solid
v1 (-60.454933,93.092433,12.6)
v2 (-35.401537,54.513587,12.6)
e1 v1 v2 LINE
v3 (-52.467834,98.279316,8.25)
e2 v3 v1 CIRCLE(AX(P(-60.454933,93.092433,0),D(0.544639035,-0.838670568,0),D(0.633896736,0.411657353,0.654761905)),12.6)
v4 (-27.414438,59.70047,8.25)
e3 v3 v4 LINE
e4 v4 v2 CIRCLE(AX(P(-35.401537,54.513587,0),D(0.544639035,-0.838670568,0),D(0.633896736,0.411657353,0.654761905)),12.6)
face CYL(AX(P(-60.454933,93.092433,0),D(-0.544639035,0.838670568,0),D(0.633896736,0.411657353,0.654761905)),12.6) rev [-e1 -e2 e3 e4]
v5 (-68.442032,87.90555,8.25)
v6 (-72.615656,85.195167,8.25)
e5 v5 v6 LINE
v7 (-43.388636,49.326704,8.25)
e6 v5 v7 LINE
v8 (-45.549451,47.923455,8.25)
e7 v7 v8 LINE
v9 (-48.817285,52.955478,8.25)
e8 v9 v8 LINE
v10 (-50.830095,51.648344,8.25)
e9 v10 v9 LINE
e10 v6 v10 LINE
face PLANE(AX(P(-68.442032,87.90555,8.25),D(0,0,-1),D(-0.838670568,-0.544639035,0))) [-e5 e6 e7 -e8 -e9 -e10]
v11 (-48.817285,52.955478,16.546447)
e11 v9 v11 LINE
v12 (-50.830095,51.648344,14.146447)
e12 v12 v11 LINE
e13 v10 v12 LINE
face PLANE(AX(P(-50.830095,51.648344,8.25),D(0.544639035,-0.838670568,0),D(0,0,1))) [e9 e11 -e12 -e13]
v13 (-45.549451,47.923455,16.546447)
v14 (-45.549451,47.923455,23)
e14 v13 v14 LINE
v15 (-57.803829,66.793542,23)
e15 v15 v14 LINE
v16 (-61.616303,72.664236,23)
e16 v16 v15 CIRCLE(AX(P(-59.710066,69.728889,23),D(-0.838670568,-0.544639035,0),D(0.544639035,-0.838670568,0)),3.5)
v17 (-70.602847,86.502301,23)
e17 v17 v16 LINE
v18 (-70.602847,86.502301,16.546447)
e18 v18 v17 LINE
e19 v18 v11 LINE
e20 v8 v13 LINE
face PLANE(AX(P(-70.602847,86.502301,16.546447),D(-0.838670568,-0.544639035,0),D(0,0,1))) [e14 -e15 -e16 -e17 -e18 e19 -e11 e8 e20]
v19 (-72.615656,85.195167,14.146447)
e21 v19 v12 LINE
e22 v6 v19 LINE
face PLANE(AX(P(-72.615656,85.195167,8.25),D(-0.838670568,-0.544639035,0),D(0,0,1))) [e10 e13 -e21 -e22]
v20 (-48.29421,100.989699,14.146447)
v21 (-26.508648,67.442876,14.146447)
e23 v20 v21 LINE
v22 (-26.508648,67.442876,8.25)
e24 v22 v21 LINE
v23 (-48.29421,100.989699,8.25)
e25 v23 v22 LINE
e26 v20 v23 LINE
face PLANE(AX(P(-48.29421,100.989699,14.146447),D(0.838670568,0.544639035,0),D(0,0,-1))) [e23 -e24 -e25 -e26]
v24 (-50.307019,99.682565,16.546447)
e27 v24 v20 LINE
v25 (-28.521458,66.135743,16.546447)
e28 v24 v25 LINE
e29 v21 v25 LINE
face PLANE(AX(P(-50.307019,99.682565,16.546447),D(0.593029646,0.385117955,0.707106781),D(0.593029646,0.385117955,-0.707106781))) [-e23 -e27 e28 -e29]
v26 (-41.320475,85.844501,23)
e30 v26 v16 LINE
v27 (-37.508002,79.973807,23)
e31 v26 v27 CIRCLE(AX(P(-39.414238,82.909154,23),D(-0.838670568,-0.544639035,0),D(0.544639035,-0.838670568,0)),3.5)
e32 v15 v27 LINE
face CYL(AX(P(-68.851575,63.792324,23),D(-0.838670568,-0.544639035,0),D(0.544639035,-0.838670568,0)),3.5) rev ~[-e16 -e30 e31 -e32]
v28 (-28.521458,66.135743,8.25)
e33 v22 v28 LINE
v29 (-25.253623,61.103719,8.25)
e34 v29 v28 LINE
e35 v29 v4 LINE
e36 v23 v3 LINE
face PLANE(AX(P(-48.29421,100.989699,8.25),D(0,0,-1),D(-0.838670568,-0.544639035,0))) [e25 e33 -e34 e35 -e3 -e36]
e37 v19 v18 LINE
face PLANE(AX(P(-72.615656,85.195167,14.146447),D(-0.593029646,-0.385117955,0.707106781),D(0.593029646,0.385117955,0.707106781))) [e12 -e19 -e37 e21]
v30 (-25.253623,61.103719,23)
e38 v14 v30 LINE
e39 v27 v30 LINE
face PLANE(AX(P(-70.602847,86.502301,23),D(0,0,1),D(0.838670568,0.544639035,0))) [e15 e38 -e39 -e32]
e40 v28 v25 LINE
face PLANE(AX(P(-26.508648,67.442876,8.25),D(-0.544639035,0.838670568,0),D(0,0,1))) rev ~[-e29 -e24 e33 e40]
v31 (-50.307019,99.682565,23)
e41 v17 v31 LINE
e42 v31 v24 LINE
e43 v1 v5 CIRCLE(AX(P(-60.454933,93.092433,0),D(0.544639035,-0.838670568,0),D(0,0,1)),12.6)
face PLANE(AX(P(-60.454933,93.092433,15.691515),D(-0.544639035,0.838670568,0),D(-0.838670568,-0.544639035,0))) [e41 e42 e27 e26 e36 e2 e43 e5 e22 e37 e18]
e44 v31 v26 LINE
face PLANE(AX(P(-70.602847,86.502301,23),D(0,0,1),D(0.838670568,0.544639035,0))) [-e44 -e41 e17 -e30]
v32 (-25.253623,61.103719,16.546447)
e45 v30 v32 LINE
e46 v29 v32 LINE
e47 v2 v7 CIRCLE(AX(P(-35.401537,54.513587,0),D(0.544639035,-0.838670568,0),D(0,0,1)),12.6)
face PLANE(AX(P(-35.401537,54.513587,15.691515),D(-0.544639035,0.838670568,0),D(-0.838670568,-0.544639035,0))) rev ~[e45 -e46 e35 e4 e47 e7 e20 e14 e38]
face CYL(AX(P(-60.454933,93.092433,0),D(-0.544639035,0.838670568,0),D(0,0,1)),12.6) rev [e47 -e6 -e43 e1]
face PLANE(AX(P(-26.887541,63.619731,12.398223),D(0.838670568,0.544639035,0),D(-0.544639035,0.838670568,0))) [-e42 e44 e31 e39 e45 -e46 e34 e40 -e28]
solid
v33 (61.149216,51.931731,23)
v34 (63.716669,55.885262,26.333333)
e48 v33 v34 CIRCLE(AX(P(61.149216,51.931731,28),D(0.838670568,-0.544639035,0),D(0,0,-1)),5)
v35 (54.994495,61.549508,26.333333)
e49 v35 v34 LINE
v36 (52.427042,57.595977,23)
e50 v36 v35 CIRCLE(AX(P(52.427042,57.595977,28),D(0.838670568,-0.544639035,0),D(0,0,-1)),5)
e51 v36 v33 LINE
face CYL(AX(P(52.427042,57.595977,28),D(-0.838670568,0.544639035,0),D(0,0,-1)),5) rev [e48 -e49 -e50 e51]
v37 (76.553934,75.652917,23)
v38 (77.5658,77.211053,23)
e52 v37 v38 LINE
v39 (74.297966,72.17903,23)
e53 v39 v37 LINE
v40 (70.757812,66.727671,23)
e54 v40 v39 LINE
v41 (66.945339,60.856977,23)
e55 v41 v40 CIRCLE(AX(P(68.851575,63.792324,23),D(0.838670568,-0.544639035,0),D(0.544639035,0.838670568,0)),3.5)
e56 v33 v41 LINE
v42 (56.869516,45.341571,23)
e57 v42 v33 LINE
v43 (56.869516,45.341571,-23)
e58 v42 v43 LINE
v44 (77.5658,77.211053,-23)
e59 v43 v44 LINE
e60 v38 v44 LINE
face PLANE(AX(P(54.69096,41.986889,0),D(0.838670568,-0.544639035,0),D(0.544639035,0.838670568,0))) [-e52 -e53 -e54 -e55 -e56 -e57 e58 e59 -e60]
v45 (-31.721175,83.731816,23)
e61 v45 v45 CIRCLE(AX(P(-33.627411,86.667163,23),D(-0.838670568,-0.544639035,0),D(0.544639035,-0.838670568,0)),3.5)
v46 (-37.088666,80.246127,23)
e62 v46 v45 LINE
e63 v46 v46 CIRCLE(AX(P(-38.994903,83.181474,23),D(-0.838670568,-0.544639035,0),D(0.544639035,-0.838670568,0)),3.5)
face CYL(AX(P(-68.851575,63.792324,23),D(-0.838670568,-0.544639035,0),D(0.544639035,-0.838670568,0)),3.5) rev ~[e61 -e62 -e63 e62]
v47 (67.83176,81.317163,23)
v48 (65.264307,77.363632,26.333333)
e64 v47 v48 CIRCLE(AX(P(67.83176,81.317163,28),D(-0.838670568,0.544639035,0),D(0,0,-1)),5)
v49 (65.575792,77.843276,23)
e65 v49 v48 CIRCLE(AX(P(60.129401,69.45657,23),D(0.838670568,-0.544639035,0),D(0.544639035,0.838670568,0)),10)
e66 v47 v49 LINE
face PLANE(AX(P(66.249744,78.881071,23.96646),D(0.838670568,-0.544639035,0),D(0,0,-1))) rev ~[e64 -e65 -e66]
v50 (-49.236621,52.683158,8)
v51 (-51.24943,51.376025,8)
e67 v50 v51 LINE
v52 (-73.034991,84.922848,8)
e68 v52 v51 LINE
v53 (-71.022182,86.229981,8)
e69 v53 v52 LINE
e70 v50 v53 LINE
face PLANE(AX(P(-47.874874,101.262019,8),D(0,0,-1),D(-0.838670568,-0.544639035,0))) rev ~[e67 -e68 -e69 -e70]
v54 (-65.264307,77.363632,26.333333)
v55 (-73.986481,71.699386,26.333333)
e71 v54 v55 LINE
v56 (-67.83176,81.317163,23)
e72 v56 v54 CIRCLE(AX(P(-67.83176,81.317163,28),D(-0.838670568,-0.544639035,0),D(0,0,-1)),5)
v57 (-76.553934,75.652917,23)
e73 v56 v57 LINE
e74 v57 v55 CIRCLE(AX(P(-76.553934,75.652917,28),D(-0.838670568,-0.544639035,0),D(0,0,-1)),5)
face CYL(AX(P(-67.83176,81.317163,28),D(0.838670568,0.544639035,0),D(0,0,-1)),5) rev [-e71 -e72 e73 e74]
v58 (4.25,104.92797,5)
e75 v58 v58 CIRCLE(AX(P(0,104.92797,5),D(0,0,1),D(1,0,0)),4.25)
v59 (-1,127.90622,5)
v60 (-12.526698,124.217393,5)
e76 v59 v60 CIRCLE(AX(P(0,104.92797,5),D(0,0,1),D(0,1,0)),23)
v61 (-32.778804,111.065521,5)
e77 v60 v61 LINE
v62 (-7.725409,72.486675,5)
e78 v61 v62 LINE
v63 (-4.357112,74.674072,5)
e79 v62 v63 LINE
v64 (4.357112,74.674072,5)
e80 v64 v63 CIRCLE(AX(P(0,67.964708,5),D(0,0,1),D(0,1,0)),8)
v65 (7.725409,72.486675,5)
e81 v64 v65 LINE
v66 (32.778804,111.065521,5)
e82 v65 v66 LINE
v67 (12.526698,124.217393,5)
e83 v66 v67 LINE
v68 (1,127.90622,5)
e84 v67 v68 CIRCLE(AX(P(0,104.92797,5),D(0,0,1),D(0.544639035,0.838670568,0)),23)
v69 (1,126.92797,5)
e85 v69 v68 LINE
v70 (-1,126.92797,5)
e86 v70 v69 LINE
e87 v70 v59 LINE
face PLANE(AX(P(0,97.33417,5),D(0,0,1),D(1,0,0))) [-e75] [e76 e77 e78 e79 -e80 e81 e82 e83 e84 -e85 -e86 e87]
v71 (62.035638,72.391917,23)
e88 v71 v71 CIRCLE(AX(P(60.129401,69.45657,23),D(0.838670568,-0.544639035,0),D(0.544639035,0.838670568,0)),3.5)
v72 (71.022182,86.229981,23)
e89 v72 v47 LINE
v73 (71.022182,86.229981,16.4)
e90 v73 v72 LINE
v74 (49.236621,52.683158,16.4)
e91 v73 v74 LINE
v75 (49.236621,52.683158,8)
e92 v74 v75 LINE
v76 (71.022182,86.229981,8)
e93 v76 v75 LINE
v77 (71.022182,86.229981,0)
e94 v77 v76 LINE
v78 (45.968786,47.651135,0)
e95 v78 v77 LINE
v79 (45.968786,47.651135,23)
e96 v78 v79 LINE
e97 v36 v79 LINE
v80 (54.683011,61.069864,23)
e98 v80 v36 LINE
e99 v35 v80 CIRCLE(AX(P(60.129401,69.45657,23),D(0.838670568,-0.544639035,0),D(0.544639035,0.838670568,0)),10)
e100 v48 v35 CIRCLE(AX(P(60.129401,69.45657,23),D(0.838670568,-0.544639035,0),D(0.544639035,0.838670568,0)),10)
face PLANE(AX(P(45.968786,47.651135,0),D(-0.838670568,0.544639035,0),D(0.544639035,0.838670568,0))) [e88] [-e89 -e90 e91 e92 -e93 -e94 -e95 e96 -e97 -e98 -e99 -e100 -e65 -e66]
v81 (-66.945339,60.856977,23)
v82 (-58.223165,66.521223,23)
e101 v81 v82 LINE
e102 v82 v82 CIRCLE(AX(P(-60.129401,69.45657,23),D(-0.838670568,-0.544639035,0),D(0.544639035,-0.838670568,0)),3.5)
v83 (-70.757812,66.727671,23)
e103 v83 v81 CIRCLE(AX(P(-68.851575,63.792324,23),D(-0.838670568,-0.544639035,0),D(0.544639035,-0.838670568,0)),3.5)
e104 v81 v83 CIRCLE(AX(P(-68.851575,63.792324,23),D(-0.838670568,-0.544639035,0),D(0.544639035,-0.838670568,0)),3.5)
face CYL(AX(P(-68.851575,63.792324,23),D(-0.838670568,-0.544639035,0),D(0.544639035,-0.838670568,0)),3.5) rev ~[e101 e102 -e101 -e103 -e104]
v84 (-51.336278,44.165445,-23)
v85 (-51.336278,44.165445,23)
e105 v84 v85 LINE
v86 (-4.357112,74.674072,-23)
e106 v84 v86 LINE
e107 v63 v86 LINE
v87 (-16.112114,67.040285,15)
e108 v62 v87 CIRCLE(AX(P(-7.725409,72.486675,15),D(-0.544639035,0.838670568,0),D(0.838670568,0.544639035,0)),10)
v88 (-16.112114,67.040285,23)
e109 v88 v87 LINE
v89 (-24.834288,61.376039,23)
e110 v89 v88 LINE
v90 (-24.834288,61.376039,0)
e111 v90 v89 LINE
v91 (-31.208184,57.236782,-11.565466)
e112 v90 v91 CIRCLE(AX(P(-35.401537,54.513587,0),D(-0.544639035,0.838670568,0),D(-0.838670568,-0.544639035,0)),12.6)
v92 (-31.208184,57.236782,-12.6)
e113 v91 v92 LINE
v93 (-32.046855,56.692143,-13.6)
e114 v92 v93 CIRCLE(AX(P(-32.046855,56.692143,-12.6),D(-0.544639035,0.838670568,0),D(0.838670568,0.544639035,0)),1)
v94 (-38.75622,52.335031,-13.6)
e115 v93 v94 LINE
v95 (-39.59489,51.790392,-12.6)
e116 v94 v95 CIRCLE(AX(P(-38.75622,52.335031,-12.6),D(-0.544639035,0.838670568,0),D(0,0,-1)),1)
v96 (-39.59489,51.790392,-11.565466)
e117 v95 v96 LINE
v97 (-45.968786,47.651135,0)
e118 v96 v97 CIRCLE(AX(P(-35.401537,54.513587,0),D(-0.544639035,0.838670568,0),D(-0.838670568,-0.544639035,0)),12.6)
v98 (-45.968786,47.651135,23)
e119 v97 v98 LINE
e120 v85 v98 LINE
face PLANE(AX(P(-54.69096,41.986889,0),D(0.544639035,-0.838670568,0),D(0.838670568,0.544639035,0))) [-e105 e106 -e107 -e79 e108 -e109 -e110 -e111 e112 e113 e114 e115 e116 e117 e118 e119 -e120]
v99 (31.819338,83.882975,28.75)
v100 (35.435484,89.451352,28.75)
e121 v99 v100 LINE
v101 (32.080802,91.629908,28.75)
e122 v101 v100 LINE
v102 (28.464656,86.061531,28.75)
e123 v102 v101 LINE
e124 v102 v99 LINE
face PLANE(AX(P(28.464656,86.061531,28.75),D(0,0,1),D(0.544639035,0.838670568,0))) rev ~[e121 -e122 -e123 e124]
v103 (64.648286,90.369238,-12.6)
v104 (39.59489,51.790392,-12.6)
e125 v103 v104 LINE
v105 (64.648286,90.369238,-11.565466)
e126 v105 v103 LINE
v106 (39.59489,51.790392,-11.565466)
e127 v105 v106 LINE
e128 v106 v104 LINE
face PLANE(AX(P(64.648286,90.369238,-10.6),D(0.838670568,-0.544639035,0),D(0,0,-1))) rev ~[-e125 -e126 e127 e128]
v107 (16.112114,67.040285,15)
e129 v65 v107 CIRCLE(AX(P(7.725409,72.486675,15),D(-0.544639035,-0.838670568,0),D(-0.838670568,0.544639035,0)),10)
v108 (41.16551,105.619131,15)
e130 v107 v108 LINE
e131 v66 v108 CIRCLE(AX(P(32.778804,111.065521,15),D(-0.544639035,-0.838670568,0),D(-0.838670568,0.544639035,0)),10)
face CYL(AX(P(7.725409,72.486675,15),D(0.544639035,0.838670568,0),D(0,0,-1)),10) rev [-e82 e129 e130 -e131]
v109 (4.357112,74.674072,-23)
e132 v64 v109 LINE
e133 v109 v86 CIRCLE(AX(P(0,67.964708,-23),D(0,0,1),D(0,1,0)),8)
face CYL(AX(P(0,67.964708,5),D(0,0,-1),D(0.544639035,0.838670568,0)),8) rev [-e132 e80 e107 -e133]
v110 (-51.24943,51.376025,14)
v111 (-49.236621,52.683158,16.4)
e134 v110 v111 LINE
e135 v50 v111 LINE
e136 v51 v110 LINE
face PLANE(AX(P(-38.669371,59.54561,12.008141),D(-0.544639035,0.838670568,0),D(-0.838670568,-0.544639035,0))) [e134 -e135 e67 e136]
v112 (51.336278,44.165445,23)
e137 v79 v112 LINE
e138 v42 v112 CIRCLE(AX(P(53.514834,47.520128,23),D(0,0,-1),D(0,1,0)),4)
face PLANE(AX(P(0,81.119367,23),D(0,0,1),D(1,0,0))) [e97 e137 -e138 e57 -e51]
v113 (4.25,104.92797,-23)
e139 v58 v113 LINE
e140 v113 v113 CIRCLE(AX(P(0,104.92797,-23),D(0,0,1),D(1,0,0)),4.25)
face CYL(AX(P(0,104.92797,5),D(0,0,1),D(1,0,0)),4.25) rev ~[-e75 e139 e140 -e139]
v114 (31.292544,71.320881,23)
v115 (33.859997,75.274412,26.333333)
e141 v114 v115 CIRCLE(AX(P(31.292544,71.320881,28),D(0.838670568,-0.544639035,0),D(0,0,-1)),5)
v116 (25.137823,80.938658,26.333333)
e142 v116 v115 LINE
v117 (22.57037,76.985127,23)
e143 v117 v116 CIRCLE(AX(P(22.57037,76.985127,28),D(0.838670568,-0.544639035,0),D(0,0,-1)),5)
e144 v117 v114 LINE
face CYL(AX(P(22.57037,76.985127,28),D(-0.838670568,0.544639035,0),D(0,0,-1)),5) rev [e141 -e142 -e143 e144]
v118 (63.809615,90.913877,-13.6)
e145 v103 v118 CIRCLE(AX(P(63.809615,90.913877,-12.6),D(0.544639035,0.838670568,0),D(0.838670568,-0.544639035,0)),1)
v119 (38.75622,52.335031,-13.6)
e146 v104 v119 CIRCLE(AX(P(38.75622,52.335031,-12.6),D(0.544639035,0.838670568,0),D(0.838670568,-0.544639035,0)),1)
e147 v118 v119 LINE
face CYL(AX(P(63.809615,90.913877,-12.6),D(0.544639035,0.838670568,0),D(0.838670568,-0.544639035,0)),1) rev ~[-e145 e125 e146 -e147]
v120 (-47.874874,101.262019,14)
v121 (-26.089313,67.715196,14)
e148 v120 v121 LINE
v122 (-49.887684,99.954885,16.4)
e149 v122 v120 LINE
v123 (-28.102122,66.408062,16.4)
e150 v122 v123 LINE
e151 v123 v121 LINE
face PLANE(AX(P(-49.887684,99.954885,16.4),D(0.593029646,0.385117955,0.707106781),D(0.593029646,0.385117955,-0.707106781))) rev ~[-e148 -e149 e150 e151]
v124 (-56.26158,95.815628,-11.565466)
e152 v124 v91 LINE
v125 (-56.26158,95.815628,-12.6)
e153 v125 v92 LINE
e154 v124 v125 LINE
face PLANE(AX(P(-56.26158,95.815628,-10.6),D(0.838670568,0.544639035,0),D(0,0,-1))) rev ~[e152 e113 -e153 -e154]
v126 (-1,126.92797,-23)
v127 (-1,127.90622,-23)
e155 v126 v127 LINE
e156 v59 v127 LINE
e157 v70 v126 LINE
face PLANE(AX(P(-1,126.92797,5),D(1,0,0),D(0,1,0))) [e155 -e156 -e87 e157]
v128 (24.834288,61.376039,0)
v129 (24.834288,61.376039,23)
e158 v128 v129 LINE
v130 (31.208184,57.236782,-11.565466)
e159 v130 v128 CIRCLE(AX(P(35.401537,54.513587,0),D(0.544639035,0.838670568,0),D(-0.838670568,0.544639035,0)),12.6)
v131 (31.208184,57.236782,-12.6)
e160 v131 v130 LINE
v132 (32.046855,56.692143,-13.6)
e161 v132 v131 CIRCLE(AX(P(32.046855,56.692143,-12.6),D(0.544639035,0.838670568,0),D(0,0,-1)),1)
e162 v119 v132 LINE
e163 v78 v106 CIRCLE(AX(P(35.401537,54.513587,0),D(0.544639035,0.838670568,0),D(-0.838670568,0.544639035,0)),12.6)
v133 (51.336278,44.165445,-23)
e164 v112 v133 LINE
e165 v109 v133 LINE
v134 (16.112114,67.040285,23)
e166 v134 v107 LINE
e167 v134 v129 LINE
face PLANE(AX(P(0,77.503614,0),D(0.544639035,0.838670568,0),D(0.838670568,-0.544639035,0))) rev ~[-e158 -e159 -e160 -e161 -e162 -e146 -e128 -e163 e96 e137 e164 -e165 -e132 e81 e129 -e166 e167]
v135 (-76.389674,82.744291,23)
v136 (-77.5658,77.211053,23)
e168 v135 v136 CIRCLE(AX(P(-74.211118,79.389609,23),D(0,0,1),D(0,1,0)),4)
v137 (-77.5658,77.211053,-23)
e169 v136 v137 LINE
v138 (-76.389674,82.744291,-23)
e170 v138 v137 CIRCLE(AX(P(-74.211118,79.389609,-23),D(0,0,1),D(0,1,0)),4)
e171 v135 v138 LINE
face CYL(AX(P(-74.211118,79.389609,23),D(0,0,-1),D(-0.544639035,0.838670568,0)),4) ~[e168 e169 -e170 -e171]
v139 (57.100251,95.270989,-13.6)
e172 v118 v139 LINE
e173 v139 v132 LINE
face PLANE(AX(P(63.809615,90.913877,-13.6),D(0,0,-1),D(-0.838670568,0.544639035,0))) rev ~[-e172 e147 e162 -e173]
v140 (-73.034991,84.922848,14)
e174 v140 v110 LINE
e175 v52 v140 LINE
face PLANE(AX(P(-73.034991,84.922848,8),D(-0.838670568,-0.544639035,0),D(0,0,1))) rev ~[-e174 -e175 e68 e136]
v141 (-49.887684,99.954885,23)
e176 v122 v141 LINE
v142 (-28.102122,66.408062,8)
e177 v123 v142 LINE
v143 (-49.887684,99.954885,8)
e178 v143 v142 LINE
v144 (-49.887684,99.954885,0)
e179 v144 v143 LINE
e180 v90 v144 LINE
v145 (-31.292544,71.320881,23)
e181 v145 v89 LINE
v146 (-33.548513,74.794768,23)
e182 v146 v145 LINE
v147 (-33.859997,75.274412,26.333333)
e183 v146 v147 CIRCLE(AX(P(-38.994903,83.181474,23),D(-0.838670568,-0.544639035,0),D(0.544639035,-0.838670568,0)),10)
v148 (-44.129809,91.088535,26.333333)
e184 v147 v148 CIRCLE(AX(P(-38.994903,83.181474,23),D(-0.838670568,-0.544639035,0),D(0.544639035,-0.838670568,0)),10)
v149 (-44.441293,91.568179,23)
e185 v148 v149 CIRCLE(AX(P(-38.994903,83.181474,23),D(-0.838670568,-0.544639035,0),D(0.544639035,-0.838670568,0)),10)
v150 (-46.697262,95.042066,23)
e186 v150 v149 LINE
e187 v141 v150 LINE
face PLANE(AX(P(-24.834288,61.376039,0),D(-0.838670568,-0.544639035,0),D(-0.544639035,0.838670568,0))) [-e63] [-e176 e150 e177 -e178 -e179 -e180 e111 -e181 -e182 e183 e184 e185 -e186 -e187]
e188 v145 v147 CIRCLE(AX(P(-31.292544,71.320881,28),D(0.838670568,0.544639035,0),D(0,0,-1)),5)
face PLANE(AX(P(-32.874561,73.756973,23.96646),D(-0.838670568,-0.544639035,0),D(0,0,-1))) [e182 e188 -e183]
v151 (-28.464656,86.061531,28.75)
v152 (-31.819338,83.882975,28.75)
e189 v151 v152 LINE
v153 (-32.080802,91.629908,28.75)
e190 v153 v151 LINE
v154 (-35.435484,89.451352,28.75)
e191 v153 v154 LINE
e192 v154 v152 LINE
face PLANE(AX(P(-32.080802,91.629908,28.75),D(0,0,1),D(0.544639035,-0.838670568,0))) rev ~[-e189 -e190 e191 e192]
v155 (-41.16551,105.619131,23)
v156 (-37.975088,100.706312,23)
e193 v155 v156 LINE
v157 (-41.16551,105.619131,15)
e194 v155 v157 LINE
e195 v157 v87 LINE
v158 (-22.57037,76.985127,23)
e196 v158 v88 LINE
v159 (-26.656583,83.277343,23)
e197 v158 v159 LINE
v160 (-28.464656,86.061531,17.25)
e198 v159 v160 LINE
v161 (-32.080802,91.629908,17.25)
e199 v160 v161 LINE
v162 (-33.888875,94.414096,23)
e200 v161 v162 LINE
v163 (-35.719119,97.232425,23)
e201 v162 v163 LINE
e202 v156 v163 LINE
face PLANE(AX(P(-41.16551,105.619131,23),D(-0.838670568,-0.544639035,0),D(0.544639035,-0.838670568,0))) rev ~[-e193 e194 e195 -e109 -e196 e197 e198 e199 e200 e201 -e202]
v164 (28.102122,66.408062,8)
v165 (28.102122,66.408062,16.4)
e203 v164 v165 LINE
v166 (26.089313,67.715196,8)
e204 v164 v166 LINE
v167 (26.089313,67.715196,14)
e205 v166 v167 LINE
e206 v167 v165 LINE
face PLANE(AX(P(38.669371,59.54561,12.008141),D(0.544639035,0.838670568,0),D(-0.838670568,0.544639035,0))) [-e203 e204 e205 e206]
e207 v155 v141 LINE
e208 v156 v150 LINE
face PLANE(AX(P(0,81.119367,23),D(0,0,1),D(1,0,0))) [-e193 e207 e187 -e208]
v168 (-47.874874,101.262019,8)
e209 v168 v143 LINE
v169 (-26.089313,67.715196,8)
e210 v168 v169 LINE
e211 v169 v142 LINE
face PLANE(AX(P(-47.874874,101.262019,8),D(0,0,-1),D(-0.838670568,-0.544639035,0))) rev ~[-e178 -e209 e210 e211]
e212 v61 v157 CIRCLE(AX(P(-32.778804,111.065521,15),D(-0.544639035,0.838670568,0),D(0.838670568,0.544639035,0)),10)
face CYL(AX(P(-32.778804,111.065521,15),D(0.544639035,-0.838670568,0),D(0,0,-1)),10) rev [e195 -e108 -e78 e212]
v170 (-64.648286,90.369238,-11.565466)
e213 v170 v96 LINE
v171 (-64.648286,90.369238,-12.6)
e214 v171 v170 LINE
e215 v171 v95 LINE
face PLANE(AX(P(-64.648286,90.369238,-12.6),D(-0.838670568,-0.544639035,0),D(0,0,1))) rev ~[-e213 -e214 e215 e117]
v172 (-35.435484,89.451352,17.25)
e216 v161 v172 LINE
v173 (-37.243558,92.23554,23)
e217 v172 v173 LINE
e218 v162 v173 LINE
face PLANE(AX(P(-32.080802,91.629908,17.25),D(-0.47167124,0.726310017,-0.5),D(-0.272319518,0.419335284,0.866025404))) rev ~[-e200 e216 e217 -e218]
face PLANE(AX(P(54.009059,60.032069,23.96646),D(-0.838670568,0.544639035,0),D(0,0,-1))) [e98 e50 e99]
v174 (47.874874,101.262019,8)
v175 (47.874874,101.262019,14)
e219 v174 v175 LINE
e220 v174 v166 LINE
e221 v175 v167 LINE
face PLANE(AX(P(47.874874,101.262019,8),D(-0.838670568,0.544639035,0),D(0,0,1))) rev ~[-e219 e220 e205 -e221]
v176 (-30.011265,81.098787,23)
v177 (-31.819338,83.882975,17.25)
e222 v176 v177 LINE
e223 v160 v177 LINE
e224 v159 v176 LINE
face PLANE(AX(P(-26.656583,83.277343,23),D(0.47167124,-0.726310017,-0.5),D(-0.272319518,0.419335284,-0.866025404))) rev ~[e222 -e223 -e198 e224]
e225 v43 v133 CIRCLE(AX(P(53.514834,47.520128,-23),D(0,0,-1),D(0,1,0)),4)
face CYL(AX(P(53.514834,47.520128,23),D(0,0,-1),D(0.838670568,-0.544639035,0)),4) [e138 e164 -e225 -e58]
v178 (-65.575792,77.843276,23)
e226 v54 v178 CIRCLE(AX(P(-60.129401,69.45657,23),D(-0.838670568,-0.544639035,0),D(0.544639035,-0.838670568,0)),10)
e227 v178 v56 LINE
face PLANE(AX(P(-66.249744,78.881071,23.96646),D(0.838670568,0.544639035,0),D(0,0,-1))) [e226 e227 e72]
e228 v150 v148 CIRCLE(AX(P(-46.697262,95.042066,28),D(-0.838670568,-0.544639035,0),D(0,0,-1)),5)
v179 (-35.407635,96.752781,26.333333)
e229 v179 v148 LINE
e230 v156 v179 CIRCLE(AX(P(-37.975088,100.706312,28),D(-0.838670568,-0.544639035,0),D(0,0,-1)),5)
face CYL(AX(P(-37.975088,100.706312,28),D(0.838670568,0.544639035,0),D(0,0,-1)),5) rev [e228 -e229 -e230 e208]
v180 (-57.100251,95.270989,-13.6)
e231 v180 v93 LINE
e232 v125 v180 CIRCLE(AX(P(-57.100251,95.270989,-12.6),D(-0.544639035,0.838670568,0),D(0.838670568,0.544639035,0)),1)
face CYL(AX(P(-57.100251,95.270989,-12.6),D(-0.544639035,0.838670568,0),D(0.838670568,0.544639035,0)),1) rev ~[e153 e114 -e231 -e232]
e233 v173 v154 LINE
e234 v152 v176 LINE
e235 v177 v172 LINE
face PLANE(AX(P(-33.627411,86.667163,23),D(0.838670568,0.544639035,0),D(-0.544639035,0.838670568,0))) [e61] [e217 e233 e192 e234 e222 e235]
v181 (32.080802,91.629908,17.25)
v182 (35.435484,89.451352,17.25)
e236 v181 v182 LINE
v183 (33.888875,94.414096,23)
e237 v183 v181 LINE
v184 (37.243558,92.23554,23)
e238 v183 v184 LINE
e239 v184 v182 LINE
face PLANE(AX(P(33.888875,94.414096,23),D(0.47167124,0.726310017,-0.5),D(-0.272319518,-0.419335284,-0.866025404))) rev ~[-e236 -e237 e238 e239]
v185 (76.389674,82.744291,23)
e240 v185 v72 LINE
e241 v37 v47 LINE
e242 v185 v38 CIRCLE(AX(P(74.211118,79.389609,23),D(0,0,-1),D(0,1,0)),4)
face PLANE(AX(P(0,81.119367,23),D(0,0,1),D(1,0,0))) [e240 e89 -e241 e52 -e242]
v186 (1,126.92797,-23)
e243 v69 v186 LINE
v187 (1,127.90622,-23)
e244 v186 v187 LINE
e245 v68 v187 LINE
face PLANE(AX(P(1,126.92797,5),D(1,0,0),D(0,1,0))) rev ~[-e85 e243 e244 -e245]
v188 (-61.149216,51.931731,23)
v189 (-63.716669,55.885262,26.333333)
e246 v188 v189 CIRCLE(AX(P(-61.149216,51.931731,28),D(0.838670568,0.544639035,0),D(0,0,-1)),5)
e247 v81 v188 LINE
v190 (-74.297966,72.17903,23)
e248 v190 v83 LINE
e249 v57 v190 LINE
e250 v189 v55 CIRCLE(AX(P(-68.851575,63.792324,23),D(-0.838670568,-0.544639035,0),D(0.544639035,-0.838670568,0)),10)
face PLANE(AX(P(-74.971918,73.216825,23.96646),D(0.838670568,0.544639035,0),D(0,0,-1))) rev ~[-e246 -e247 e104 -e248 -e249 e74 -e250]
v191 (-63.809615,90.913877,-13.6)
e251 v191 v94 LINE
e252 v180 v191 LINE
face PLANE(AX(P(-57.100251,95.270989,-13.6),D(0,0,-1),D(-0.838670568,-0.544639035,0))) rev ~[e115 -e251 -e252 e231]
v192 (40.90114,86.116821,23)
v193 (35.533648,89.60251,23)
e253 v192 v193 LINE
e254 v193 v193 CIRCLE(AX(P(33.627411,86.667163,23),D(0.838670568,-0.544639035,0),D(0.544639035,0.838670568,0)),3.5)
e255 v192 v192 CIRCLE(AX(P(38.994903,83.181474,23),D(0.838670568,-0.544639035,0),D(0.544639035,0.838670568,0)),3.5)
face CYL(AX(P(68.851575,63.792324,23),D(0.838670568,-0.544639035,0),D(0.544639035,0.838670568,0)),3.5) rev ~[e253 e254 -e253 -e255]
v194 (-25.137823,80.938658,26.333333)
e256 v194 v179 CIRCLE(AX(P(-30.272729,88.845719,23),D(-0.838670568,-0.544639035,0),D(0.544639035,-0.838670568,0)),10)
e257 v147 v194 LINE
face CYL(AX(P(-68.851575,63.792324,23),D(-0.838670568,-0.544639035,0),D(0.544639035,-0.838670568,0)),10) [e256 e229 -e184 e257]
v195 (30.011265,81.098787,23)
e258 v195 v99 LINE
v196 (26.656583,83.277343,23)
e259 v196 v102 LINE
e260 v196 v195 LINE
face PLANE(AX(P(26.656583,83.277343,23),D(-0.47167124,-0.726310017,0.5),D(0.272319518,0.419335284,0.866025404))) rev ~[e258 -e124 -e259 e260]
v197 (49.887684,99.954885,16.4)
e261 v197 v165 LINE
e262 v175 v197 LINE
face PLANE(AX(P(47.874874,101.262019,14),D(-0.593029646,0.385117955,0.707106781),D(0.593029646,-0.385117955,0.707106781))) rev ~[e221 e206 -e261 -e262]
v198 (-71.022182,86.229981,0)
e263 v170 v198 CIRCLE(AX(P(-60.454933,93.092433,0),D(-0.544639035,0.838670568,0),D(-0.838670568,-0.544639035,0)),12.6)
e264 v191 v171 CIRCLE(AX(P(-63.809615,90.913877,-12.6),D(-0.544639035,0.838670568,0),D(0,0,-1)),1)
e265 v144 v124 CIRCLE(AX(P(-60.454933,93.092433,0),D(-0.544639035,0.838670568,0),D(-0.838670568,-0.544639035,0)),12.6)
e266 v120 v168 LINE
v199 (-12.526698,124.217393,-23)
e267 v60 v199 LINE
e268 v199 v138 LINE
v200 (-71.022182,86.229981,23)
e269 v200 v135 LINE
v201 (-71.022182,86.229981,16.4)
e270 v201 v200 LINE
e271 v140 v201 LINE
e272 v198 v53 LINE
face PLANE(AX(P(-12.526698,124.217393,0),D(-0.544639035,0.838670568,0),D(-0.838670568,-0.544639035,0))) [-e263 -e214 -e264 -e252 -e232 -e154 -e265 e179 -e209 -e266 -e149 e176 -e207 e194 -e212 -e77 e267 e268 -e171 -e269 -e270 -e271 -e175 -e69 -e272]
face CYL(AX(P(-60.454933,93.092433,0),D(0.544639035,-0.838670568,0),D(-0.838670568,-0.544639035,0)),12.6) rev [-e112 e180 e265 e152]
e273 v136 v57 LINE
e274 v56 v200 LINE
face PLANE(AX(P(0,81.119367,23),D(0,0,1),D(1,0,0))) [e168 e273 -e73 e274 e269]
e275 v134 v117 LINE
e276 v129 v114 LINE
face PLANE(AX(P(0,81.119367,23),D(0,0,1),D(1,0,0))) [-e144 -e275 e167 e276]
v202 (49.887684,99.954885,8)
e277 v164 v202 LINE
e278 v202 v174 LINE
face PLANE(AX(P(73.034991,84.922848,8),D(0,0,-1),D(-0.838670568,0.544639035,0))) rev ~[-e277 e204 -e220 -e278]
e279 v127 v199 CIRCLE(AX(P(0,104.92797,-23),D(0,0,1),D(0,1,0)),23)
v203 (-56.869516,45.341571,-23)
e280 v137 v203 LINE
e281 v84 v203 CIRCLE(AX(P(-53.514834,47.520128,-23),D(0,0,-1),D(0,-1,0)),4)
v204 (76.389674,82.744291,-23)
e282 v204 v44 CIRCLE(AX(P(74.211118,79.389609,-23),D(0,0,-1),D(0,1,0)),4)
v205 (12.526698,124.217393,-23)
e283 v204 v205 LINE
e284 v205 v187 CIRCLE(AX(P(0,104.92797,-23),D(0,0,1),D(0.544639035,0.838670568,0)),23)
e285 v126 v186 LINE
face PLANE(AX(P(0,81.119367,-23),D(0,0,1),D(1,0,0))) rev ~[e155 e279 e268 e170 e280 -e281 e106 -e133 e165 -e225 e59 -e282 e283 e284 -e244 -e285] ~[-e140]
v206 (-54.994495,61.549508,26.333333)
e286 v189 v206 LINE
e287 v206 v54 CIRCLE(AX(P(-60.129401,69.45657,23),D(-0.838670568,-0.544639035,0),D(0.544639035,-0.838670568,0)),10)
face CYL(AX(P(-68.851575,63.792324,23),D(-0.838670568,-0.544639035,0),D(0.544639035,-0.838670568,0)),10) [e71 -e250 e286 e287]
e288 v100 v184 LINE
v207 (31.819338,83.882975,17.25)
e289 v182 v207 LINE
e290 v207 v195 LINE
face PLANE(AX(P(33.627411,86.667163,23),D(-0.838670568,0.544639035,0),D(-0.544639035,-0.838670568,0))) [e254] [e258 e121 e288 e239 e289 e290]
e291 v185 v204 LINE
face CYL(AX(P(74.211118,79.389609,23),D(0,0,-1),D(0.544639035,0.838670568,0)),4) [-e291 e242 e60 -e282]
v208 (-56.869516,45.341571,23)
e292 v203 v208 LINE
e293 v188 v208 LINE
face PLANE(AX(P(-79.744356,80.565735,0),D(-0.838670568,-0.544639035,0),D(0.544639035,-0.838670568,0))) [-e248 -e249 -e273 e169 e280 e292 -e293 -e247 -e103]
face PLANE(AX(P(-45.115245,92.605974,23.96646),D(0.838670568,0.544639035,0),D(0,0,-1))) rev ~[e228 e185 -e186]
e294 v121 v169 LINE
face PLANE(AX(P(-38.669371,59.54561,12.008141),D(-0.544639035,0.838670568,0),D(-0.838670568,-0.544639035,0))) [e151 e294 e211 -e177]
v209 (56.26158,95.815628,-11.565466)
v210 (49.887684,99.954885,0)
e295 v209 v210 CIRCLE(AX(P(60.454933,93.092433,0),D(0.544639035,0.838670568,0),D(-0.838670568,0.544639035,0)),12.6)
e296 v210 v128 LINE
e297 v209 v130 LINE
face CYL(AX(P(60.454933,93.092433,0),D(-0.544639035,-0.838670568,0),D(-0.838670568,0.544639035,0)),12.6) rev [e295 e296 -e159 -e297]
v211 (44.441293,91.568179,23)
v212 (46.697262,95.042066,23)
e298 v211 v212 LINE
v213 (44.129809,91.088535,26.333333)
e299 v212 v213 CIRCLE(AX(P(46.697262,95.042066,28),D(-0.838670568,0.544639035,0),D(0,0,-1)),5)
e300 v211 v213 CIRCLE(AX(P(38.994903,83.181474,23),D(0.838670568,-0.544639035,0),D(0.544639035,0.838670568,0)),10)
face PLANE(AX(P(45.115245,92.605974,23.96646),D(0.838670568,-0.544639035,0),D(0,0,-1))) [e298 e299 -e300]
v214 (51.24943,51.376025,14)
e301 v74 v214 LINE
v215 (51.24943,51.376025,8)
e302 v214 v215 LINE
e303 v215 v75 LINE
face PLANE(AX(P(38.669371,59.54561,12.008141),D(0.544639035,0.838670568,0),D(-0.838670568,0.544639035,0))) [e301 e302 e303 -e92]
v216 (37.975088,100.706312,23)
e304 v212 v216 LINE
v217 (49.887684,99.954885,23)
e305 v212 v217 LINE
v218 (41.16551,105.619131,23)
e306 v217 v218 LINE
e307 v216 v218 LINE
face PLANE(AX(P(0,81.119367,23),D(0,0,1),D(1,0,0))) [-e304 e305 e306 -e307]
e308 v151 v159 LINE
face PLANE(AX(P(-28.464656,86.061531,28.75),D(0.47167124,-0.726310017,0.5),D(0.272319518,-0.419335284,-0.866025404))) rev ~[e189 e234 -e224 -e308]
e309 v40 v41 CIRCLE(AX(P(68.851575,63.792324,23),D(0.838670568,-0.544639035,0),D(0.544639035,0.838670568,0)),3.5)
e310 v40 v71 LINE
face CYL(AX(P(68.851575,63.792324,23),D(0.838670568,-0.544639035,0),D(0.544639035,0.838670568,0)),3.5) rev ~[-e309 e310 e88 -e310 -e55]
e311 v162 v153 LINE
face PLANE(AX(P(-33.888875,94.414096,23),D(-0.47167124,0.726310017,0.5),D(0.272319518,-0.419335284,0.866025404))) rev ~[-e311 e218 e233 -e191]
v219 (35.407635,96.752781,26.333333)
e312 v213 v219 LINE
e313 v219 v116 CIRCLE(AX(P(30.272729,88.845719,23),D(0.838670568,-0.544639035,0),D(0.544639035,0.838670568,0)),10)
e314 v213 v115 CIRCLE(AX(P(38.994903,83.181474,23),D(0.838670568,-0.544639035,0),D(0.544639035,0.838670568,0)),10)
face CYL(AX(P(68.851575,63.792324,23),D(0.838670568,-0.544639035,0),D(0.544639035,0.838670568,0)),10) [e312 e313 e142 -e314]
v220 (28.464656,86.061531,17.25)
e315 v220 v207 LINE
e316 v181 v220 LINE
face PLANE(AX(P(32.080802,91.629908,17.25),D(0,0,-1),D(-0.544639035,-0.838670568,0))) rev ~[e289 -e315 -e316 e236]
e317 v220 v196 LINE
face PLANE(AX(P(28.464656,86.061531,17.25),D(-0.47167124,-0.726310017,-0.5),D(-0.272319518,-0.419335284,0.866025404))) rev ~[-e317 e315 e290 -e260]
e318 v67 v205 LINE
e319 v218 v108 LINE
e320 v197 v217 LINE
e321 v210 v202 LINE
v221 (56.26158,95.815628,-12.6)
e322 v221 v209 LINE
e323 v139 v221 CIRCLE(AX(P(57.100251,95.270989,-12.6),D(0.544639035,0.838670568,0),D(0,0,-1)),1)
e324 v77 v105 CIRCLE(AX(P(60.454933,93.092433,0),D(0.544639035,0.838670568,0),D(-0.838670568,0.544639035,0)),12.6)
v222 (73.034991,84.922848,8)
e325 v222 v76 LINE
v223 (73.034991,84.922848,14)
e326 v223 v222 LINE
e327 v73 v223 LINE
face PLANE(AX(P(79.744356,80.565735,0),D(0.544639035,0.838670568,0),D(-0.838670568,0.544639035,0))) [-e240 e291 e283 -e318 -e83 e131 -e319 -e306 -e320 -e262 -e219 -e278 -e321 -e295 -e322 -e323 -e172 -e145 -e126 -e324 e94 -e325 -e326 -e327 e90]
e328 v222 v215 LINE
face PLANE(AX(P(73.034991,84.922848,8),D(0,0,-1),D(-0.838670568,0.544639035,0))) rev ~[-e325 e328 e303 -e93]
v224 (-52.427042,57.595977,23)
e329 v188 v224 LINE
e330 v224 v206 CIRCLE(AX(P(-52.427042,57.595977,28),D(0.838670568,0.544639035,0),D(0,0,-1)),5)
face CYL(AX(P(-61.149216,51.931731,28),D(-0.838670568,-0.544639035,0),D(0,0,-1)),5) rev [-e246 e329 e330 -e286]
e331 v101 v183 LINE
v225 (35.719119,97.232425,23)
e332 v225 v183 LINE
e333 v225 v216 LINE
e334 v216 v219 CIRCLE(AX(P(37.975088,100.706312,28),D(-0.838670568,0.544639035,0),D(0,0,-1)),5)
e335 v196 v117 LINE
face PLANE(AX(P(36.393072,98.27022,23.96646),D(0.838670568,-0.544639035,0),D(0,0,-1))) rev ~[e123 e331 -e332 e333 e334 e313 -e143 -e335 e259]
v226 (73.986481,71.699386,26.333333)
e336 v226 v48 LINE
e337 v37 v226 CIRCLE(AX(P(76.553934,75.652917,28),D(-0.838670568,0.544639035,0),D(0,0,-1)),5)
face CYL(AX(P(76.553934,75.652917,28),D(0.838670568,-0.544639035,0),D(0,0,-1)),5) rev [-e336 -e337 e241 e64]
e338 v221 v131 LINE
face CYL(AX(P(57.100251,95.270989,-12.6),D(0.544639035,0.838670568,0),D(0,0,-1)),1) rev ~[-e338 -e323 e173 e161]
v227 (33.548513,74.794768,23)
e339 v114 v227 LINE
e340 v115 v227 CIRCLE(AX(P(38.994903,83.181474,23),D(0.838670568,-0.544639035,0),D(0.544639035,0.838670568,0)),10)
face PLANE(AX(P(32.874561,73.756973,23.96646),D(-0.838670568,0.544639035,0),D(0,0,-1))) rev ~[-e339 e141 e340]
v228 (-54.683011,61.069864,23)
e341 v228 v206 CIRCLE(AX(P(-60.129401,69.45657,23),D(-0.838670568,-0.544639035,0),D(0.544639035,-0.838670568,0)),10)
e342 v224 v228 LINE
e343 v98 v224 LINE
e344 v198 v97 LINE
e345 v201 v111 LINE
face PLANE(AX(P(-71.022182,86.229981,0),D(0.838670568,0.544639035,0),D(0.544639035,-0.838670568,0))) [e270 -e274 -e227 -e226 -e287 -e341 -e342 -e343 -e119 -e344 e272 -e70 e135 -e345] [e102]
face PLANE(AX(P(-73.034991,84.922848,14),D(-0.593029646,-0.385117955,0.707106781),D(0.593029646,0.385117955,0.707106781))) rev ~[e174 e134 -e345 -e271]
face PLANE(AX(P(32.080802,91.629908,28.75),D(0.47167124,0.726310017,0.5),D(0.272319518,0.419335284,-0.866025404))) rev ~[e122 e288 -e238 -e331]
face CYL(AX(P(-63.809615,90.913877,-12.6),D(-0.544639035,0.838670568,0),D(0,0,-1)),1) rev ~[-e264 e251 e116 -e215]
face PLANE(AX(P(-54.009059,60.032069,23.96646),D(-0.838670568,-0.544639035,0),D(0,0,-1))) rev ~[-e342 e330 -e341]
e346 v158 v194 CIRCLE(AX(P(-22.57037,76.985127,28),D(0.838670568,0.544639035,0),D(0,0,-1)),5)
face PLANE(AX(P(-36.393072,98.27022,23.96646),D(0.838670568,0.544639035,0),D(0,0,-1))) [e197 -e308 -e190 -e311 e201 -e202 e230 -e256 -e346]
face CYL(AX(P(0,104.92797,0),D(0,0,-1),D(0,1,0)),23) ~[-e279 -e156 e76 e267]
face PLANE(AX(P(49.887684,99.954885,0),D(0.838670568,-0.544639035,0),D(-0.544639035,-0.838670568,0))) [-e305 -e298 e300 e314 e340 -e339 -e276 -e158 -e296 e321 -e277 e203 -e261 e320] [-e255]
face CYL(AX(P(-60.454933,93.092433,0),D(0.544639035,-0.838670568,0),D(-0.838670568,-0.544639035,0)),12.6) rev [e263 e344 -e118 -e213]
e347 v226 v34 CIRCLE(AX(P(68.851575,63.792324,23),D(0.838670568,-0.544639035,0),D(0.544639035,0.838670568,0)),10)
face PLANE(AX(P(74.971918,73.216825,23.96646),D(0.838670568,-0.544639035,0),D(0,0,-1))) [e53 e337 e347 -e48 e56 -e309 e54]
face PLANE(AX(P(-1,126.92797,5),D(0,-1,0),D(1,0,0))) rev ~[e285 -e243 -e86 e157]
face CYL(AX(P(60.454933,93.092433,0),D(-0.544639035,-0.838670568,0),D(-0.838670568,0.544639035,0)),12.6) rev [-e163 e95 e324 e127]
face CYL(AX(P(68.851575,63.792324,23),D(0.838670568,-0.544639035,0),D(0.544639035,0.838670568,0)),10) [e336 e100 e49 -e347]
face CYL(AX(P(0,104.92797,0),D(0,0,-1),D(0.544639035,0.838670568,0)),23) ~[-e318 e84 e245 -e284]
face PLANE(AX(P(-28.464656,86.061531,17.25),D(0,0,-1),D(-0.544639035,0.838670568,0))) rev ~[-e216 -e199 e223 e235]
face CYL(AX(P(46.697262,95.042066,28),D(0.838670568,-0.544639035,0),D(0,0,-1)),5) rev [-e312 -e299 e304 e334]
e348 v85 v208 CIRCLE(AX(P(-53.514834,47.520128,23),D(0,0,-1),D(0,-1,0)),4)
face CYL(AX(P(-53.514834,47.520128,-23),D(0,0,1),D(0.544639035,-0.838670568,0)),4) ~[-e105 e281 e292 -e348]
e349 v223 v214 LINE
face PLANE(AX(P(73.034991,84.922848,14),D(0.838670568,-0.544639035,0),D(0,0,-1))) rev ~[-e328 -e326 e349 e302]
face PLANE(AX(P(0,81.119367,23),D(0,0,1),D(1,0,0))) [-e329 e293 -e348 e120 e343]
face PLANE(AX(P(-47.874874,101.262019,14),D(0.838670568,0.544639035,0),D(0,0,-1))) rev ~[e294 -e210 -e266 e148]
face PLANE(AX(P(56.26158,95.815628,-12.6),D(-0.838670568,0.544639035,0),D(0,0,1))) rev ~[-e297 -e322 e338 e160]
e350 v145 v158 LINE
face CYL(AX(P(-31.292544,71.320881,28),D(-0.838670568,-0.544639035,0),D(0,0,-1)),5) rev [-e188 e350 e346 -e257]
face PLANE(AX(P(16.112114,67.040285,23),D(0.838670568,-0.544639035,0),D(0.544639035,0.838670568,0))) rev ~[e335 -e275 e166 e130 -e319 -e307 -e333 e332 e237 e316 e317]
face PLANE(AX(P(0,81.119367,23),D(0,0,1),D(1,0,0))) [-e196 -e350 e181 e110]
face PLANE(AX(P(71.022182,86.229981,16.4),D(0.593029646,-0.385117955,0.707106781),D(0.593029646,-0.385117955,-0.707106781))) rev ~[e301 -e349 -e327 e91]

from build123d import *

# Parameters (mm, degrees)
F1_DEPTH      = 23
F7_DEPTH      = 18
F8_R          = 10
F10_DEPTH     = 46
F9_R          = 10
F11_DEPTH     = 46
F14_DEPTH     = 33.001
F15_DEPTH     = 33.001
F16_R         = 8
F17_R         = 10
F20_DEPTH     = 40
F21_DEPTH     = 40
F24_DEPTH     = 46
F25_DEPTH     = 46
F26_T1_DEPTH  = 10.4
F26_T3_DEPTH  = 10.4
F26_T5_DEPTH  = 10.4
F26_T7_DEPTH  = 10.4
F26_T9_DEPTH  = 10.4
F26_T11_DEPTH = 10.4
F26_T13_DEPTH = 10.4
F26_T15_DEPTH = 10.4
F27_R         = 4.25
F27_W         = 2
F27_H         = 2
F28_DEPTH     = 28
F30_DEPTH     = 46
F31_R         = 3.5
F32_DEPTH     = 46
F33_R         = 3.5
F34_DEPTH     = 46
F36_DEPTH     = 4
F38_DEPTH     = 4
F39_R         = 4
F40_W         = 6
F40_H         = 8.2964466094
F41_DEPTH     = 2.4
F42_W         = 6.0000000001
F42_H         = 8.2964466094
F43_DEPTH     = 2.4


# Not quite as in the source:
# - a fillet or chamfer that OpenCascade refuses, or shapes differently, is made with other operations: its cross-section is extruded or revolved along the edge and cut away or added


with BuildPart() as f1:
    # F0 (on Top) → F1 (new body, symmetric)
    with BuildSketch(Plane.XY):
        with BuildLine():
            Line((-79.7443559494, 80.5657352366), (-54.6909603387, 41.9868891111))
            Line((-54.6909603387, 41.9868891111), (0, 77.5036140343))
            Line((0, 77.5036140343), (54.6909603387, 41.9868891111))
            Line((54.6909603387, 41.9868891111), (79.7443559494, 80.5657352366))
            Line((79.7443559494, 80.5657352366), (12.5266978053, 124.2173928323))
            ThreePointArc((12.5266978053, 124.2173928323), (6.5323529282, 126.9808236715), (0, 127.9279697696))
            ThreePointArc((0, 127.9279697696), (-6.5323529282, 126.9808236715), (-12.5266978053, 124.2173928323))
            Line((-12.5266978053, 124.2173928323), (-79.7443559494, 80.5657352366))
        make_face()
    extrude(amount=F1_DEPTH, both=True)

    # F2 (on Top) → F4 (revolve, cut)
    with BuildSketch(Plane.XY):
        Polygon((-71.0221820428, 86.2299812008), (-45.9687864321, 47.6511350753), (-35.401537276, 54.5135869165), (-60.4549328867, 93.0924330419), align=None)
    revolve(axis=Axis((-28.5739341007, 44, 0), (-0.544639035, 0.8386705679, 0)), mode=Mode.SUBTRACT)

    # F3 (on Top) → F5 (revolve, cut)
    with BuildSketch(Plane.XY):
        Polygon((49.8876837306, 99.9548848831), (24.8342881199, 61.3760387576), (35.401537276, 54.5135869165), (60.4549328867, 93.0924330419), align=None)
    revolve(axis=Axis((28.5739341007, 44, 0), (0.544639035, 0.8386705679, 0)), mode=Mode.SUBTRACT)

    # F6 (on face) → F7 (cut)
    with BuildSketch(Plane.XY.offset(23)):
        with BuildLine():
            Line((-12.5266978053, 124.2173928323), (-41.1655098239, 105.6191308473))
            Line((-41.1655098239, 105.6191308473), (-16.1121142132, 67.0402847218))
            Line((-16.1121142132, 67.0402847218), (0, 77.5036140343))
            Line((0, 77.5036140343), (16.1121142132, 67.0402847218))
            Line((16.1121142132, 67.0402847218), (41.1655098239, 105.6191308473))
            Line((41.1655098239, 105.6191308473), (12.5266978053, 124.2173928323))
            ThreePointArc((12.5266978053, 124.2173928323), (6.5323529282, 126.9808236715), (0, 127.9279697696))
            ThreePointArc((0, 127.9279697696), (-6.5323529282, 126.9808236715), (-12.5266978053, 124.2173928323))
        make_face()
    extrude(amount=-F7_DEPTH, mode=Mode.SUBTRACT)

    # F8 (on face) → F10 (join, through all)
    with BuildSketch(Plane(origin=(-19.2894230627, -12.5266978053, 0), x_dir=(0.544639035, -0.8386705679, 0), z_dir=(-0.8386705679, -0.544639035, 0))):
        with Locations((-91, 23)):
            Circle(F8_R)
    extrude(amount=-F10_DEPTH)

    # F9 (on face) → F11 (join, through all)
    with BuildSketch(Plane(origin=(19.2894230627, -12.5266978053, 0), x_dir=(0.544639035, 0.8386705679, 0), z_dir=(0.8386705679, -0.544639035, 0))):
        with Locations((91, 23)):
            Circle(F9_R)
    extrude(amount=-F11_DEPTH)

    # F12 (on Top) → F14 (cut, through all)
    with BuildSketch(Plane.XY):
        Polygon((-71.0221820428, 86.2299812008), (-45.9687864321, 47.6511350753), (-35.401537276, 54.5135869165), (-24.8342881199, 61.3760387576), (-49.8876837306, 99.9548848831), (-60.4549328867, 93.0924330419), align=None)
    extrude(amount=F14_DEPTH, mode=Mode.SUBTRACT)

    # F13 (on Top) → F15 (cut, through all)
    with BuildSketch(Plane.XY):
        Polygon((24.8342881199, 61.3760387576), (35.401537276, 54.5135869165), (45.9687864321, 47.6511350753), (71.0221820428, 86.2299812008), (60.4549328867, 93.0924330419), (49.8876837306, 99.9548848831), align=None)
    extrude(amount=F15_DEPTH, mode=Mode.SUBTRACT)

    # F16
    f16_edges = [f1.edges().sort_by_distance(p)[0] for p in [
        (0, 77.503614, 2.5),
        (0, 77.503614, -11.5),
    ]]
    fillet(f16_edges, radius=F16_R)

    # F17
    f17_edges = [f1.edges().sort_by_distance(p)[0] for p in [
        (28.638812, 86.329708, 5),
        (-28.638812, 86.329708, 5),
    ]]
    fillet(f17_edges, radius=F17_R)

    # F18 (on face) → F20 (cut)
    with BuildSketch(Plane(origin=(-60.4549328867, 93.0924330419, 0), x_dir=(-0.8386705679, -0.544639035, 0), z_dir=(-0.544639035, 0.8386705679, 0))):
        Polygon((12.6, 16.4), (-12.6, 16.4), (-15, 14), (-15, 8), (15, 8), (15, 14), align=None)
    extrude(amount=-F20_DEPTH, mode=Mode.SUBTRACT)

    # F19 (on face) → F21 (cut)
    with BuildSketch(Plane(origin=(60.4549328867, 93.0924330419, 0), x_dir=(-0.8386705679, 0.544639035, 0), z_dir=(0.544639035, 0.8386705679, 0))):
        Polygon((-15, 14), (-15, 8), (15, 8), (15, 14), (12.6, 16.4), (-12.6, 16.4), align=None)
    extrude(amount=-F21_DEPTH, mode=Mode.SUBTRACT)

    # F22 (on face) → F24 (cut, through all)
    with BuildSketch(Plane(origin=(-60.4549328867, 93.0924330419, 0), x_dir=(-0.8386705679, -0.544639035, 0), z_dir=(-0.544639035, 0.8386705679, 0))):
        with BuildLine():
            Line((5, -10.6), (-5, -10.6))
            Line((-5, -10.6), (-5, -12.6))
            ThreePointArc((-5, -12.6), (-4.7071067812, -13.3071067812), (-4, -13.6))
            Line((-4, -13.6), (4, -13.6))
            ThreePointArc((4, -13.6), (4.7071067812, -13.3071067812), (5, -12.6))
            Line((5, -12.6), (5, -10.6))
        make_face()
    extrude(amount=-F24_DEPTH, mode=Mode.SUBTRACT)

    # F23 (on face) → F25 (cut, through all)
    with BuildSketch(Plane(origin=(60.4549328867, 93.0924330419, 0), x_dir=(-0.8386705679, 0.544639035, 0), z_dir=(0.544639035, 0.8386705679, 0))):
        with BuildLine():
            ThreePointArc((-5, -12.6), (-4.7071067812, -13.3071067812), (-4, -13.6))
            Line((-4, -13.6), (4, -13.6))
            ThreePointArc((4, -13.6), (4.7071067812, -13.3071067812), (5, -12.6))
            Line((5, -12.6), (5, -10.6))
            Line((5, -10.6), (-5, -10.6))
            Line((-5, -10.6), (-5, -12.6))
        make_face()
    extrude(amount=-F25_DEPTH, mode=Mode.SUBTRACT)

    # F26: fillet of radius 5 on 8 edges, made by hand

    # F26_s2 → F26_t1 (join)
    with BuildSketch(Plane(origin=(10.5672491561, 6.8624518412, 0), x_dir=(0, 0, 1), z_dir=(0.8386705679, 0.544639035, 0))):
        with BuildLine():
            ThreePointArc((23, -76.8578643763), (23.9175170954, -79.7446157222), (26.3333333333, -81.5719095842))
            ThreePointArc((26.3333333333, -81.5719095842), (24.6910197873, -81.1440144035), (23, -81))
            Line((23, -81), (23, -76.8578643763))
        make_face()
    extrude(amount=F26_T1_DEPTH)

    # F26_s4 → F26_t3 (join)
    with BuildSketch(Plane(origin=(-19.2894230627, -12.5266978053, 0), x_dir=(0, 0, 1), z_dir=(0.8386705679, 0.544639035, 0))):
        with BuildLine():
            ThreePointArc((23, -76.8578643763), (23.9175170954, -79.7446157222), (26.3333333333, -81.5719095842))
            ThreePointArc((26.3333333333, -81.5719095842), (24.6910197873, -81.1440144035), (23, -81))
            Line((23, -81), (23, -76.8578643763))
        make_face()
    extrude(amount=F26_T3_DEPTH)

    # F26_s6 → F26_t5 (join)
    with BuildSketch(Plane(origin=(10.5672491561, -6.8624518412, 0), x_dir=(0, 0, 1), z_dir=(0.8386705679, -0.544639035, 0))):
        with BuildLine():
            ThreePointArc((23, -76.8578643763), (23.9175170954, -79.7446157222), (26.3333333333, -81.5719095842))
            ThreePointArc((26.3333333333, -81.5719095842), (24.6910197873, -81.1440144035), (23, -81))
            Line((23, -81), (23, -76.8578643763))
        make_face()
    extrude(amount=F26_T5_DEPTH)

    # F26_s8 → F26_t7 (join)
    with BuildSketch(Plane(origin=(-19.2894230627, 12.5266978053, 0), x_dir=(0, 0, 1), z_dir=(0.8386705679, -0.544639035, 0))):
        with BuildLine():
            ThreePointArc((23, -76.8578643763), (23.9175170954, -79.7446157222), (26.3333333333, -81.5719095842))
            ThreePointArc((26.3333333333, -81.5719095842), (24.6910197873, -81.1440144035), (23, -81))
            Line((23, -81), (23, -76.8578643763))
        make_face()
    extrude(amount=F26_T7_DEPTH)

    # F26_s10 → F26_t9 (join)
    with BuildSketch(Plane(origin=(19.2894230627, 12.5266978053, 0), x_dir=(0, 0, 1), z_dir=(-0.8386705679, -0.544639035, 0))):
        with BuildLine():
            ThreePointArc((23, 105.1421356237), (23.9175170954, 102.2553842778), (26.3333333333, 100.4280904158))
            ThreePointArc((26.3333333333, 100.4280904158), (24.6910197873, 100.8559855965), (23, 101))
            Line((23, 101), (23, 105.1421356237))
        make_face()
    extrude(amount=F26_T9_DEPTH)

    # F26_s12 → F26_t11 (join)
    with BuildSketch(Plane(origin=(-10.5672491561, -6.8624518412, 0), x_dir=(0, 0, 1), z_dir=(-0.8386705679, -0.544639035, 0))):
        with BuildLine():
            ThreePointArc((23, 105.1421356237), (23.9175170954, 102.2553842778), (26.3333333333, 100.4280904158))
            ThreePointArc((26.3333333333, 100.4280904158), (24.6910197873, 100.8559855965), (23, 101))
            Line((23, 101), (23, 105.1421356237))
        make_face()
    extrude(amount=F26_T11_DEPTH)

    # F26_s14 → F26_t13 (join)
    with BuildSketch(Plane(origin=(-10.5672491561, 6.8624518412, 0), x_dir=(0, 0, 1), z_dir=(-0.8386705679, 0.544639035, 0))):
        with BuildLine():
            ThreePointArc((23, 105.1421356237), (23.9175170954, 102.2553842778), (26.3333333333, 100.4280904158))
            ThreePointArc((26.3333333333, 100.4280904158), (24.6910197873, 100.8559855965), (23, 101))
            Line((23, 101), (23, 105.1421356237))
        make_face()
    extrude(amount=F26_T13_DEPTH)

    # F26_s16 → F26_t15 (join)
    with BuildSketch(Plane(origin=(19.2894230627, -12.5266978053, 0), x_dir=(0, 0, 1), z_dir=(-0.8386705679, 0.544639035, 0))):
        with BuildLine():
            ThreePointArc((23, 105.1421356237), (23.9175170954, 102.2553842778), (26.3333333333, 100.4280904158))
            ThreePointArc((26.3333333333, 100.4280904158), (24.6910197873, 100.8559855965), (23, 101))
            Line((23, 101), (23, 105.1421356237))
        make_face()
    extrude(amount=F26_T15_DEPTH)

    # F27 (on face) → F28 (cut, through all)
    with BuildSketch(Plane.XY.offset(5)):
        with Locations((0, 104.9279697696)):
            Circle(F27_R)
        with Locations((0, 127.9279697696)):
            Rectangle(F27_W, F27_H)
    extrude(amount=-F28_DEPTH, mode=Mode.SUBTRACT)


with BuildPart() as f30:
    # F29 (on face) → F30 (new body, through all)
    with BuildSketch(Plane(origin=(-60.4549328867, 93.0924330419, 0), x_dir=(-0.8386705679, -0.544639035, 0), z_dir=(-0.544639035, 0.8386705679, 0))):
        with BuildLine():
            ThreePointArc((-9.5235235076, 8.25), (-5.23497851, 11.4610208969), (0, 12.6))
            ThreePointArc((0, 12.6), (5.23497851, 11.4610208969), (9.5235235076, 8.25))
            Line((9.5235235076, 8.25), (14.5, 8.25))
            Line((14.5, 8.25), (14.5, 14.1464466094))
            Line((14.5, 14.1464466094), (12.1, 16.5464466094))
            Line((12.1, 16.5464466094), (12.1, 23))
            Line((12.1, 23), (0, 23))
            Line((0, 23), (-12.1, 23))
            Line((-12.1, 23), (-12.1, 16.5464466094))
            Line((-12.1, 16.5464466094), (-14.5, 14.1464466094))
            Line((-14.5, 14.1464466094), (-14.5, 8.25))
            Line((-14.5, 8.25), (-9.5235235076, 8.25))
        make_face()
    extrude(amount=-F30_DEPTH)


with BuildPart() as f32_tool:
    # F31 (on face) → F32 (new body, through all)
    with BuildSketch(Plane(origin=(-19.2894230627, -12.5266978053, 0), x_dir=(0.544639035, -0.8386705679, 0), z_dir=(-0.8386705679, -0.544639035, 0))):
        with Locations((-91, 23)):
            Circle(F31_R)
    extrude(amount=-F32_DEPTH)


with BuildPart() as f1_1:
    add(f1.part)

    # F32: cut by f32_tool
    add(f32_tool.part, mode=Mode.SUBTRACT)

    # F33 (on face) → F34 (cut, through all)
    with BuildSketch(Plane(origin=(19.2894230627, -12.5266978053, 0), x_dir=(0.544639035, 0.8386705679, 0), z_dir=(0.8386705679, -0.544639035, 0))):
        with Locations((91, 23)):
            Circle(F33_R)
    extrude(amount=-F34_DEPTH, mode=Mode.SUBTRACT)

    # F35 (on face) → F36 (cut)
    with BuildSketch(Plane(origin=(19.2894230627, 12.5266978053, 0), x_dir=(-0.544639035, 0.8386705679, 0), z_dir=(0.8386705679, 0.544639035, 0))):
        Polygon((87.6802359521, 28.75), (84.3604719042, 23), (87.6802359521, 17.25), (94.3197640477, 17.25), (97.6395280956, 23), (94.3197640477, 28.75), align=None)
    extrude(amount=-F36_DEPTH, mode=Mode.SUBTRACT)

    # F37 (on face) → F38 (cut)
    with BuildSketch(Plane(origin=(-19.2894230627, 12.5266978053, 0), x_dir=(-0.544639035, -0.8386705679, 0), z_dir=(-0.8386705679, 0.544639035, 0))):
        Polygon((-94.319764048, 28.75), (-97.6395280959, 23), (-94.319764048, 17.25), (-87.6802359523, 17.25), (-84.3604719045, 23), (-87.6802359523, 28.75), align=None)
    extrude(amount=-F38_DEPTH, mode=Mode.SUBTRACT)

    # F39
    f39_edges = [f1_1.edges().sort_by_distance(p)[0] for p in [
        (79.744356, 80.565735, 0),
        (54.69096, 41.986889, 0),
        (-54.69096, 41.986889, 0),
        (-79.744356, 80.565735, 0),
    ]]
    fillet(f39_edges, radius=F39_R)


with BuildPart() as f30_1:
    add(f30.part)

    # F32: cut by f32_tool
    add(f32_tool.part, mode=Mode.SUBTRACT)

    # F40 (on face) → F41 (cut, through all)
    with BuildSketch(Plane(origin=(-12.1607232352, -7.8972660077, 0), x_dir=(0.544639035, -0.8386705679, 0), z_dir=(-0.8386705679, -0.544639035, 0))):
        with Locations((-67.9999999999, 12.3982233047)):
            Rectangle(F40_W, F40_H)
    extrude(amount=-F41_DEPTH, mode=Mode.SUBTRACT)

    # F42 (on face) → F43 (cut, through all)
    with BuildSketch(Plane(origin=(12.1607232352, 7.8972660077, 0), x_dir=(-0.544639035, 0.8386705679, 0), z_dir=(0.8386705679, 0.544639035, 0))):
        with Locations((67.9999999999, 12.3982233047)):
            Rectangle(F42_W, F42_H)
    extrude(amount=-F43_DEPTH, mode=Mode.SUBTRACT)


solid = Compound([f1_1.part, f30_1.part])
